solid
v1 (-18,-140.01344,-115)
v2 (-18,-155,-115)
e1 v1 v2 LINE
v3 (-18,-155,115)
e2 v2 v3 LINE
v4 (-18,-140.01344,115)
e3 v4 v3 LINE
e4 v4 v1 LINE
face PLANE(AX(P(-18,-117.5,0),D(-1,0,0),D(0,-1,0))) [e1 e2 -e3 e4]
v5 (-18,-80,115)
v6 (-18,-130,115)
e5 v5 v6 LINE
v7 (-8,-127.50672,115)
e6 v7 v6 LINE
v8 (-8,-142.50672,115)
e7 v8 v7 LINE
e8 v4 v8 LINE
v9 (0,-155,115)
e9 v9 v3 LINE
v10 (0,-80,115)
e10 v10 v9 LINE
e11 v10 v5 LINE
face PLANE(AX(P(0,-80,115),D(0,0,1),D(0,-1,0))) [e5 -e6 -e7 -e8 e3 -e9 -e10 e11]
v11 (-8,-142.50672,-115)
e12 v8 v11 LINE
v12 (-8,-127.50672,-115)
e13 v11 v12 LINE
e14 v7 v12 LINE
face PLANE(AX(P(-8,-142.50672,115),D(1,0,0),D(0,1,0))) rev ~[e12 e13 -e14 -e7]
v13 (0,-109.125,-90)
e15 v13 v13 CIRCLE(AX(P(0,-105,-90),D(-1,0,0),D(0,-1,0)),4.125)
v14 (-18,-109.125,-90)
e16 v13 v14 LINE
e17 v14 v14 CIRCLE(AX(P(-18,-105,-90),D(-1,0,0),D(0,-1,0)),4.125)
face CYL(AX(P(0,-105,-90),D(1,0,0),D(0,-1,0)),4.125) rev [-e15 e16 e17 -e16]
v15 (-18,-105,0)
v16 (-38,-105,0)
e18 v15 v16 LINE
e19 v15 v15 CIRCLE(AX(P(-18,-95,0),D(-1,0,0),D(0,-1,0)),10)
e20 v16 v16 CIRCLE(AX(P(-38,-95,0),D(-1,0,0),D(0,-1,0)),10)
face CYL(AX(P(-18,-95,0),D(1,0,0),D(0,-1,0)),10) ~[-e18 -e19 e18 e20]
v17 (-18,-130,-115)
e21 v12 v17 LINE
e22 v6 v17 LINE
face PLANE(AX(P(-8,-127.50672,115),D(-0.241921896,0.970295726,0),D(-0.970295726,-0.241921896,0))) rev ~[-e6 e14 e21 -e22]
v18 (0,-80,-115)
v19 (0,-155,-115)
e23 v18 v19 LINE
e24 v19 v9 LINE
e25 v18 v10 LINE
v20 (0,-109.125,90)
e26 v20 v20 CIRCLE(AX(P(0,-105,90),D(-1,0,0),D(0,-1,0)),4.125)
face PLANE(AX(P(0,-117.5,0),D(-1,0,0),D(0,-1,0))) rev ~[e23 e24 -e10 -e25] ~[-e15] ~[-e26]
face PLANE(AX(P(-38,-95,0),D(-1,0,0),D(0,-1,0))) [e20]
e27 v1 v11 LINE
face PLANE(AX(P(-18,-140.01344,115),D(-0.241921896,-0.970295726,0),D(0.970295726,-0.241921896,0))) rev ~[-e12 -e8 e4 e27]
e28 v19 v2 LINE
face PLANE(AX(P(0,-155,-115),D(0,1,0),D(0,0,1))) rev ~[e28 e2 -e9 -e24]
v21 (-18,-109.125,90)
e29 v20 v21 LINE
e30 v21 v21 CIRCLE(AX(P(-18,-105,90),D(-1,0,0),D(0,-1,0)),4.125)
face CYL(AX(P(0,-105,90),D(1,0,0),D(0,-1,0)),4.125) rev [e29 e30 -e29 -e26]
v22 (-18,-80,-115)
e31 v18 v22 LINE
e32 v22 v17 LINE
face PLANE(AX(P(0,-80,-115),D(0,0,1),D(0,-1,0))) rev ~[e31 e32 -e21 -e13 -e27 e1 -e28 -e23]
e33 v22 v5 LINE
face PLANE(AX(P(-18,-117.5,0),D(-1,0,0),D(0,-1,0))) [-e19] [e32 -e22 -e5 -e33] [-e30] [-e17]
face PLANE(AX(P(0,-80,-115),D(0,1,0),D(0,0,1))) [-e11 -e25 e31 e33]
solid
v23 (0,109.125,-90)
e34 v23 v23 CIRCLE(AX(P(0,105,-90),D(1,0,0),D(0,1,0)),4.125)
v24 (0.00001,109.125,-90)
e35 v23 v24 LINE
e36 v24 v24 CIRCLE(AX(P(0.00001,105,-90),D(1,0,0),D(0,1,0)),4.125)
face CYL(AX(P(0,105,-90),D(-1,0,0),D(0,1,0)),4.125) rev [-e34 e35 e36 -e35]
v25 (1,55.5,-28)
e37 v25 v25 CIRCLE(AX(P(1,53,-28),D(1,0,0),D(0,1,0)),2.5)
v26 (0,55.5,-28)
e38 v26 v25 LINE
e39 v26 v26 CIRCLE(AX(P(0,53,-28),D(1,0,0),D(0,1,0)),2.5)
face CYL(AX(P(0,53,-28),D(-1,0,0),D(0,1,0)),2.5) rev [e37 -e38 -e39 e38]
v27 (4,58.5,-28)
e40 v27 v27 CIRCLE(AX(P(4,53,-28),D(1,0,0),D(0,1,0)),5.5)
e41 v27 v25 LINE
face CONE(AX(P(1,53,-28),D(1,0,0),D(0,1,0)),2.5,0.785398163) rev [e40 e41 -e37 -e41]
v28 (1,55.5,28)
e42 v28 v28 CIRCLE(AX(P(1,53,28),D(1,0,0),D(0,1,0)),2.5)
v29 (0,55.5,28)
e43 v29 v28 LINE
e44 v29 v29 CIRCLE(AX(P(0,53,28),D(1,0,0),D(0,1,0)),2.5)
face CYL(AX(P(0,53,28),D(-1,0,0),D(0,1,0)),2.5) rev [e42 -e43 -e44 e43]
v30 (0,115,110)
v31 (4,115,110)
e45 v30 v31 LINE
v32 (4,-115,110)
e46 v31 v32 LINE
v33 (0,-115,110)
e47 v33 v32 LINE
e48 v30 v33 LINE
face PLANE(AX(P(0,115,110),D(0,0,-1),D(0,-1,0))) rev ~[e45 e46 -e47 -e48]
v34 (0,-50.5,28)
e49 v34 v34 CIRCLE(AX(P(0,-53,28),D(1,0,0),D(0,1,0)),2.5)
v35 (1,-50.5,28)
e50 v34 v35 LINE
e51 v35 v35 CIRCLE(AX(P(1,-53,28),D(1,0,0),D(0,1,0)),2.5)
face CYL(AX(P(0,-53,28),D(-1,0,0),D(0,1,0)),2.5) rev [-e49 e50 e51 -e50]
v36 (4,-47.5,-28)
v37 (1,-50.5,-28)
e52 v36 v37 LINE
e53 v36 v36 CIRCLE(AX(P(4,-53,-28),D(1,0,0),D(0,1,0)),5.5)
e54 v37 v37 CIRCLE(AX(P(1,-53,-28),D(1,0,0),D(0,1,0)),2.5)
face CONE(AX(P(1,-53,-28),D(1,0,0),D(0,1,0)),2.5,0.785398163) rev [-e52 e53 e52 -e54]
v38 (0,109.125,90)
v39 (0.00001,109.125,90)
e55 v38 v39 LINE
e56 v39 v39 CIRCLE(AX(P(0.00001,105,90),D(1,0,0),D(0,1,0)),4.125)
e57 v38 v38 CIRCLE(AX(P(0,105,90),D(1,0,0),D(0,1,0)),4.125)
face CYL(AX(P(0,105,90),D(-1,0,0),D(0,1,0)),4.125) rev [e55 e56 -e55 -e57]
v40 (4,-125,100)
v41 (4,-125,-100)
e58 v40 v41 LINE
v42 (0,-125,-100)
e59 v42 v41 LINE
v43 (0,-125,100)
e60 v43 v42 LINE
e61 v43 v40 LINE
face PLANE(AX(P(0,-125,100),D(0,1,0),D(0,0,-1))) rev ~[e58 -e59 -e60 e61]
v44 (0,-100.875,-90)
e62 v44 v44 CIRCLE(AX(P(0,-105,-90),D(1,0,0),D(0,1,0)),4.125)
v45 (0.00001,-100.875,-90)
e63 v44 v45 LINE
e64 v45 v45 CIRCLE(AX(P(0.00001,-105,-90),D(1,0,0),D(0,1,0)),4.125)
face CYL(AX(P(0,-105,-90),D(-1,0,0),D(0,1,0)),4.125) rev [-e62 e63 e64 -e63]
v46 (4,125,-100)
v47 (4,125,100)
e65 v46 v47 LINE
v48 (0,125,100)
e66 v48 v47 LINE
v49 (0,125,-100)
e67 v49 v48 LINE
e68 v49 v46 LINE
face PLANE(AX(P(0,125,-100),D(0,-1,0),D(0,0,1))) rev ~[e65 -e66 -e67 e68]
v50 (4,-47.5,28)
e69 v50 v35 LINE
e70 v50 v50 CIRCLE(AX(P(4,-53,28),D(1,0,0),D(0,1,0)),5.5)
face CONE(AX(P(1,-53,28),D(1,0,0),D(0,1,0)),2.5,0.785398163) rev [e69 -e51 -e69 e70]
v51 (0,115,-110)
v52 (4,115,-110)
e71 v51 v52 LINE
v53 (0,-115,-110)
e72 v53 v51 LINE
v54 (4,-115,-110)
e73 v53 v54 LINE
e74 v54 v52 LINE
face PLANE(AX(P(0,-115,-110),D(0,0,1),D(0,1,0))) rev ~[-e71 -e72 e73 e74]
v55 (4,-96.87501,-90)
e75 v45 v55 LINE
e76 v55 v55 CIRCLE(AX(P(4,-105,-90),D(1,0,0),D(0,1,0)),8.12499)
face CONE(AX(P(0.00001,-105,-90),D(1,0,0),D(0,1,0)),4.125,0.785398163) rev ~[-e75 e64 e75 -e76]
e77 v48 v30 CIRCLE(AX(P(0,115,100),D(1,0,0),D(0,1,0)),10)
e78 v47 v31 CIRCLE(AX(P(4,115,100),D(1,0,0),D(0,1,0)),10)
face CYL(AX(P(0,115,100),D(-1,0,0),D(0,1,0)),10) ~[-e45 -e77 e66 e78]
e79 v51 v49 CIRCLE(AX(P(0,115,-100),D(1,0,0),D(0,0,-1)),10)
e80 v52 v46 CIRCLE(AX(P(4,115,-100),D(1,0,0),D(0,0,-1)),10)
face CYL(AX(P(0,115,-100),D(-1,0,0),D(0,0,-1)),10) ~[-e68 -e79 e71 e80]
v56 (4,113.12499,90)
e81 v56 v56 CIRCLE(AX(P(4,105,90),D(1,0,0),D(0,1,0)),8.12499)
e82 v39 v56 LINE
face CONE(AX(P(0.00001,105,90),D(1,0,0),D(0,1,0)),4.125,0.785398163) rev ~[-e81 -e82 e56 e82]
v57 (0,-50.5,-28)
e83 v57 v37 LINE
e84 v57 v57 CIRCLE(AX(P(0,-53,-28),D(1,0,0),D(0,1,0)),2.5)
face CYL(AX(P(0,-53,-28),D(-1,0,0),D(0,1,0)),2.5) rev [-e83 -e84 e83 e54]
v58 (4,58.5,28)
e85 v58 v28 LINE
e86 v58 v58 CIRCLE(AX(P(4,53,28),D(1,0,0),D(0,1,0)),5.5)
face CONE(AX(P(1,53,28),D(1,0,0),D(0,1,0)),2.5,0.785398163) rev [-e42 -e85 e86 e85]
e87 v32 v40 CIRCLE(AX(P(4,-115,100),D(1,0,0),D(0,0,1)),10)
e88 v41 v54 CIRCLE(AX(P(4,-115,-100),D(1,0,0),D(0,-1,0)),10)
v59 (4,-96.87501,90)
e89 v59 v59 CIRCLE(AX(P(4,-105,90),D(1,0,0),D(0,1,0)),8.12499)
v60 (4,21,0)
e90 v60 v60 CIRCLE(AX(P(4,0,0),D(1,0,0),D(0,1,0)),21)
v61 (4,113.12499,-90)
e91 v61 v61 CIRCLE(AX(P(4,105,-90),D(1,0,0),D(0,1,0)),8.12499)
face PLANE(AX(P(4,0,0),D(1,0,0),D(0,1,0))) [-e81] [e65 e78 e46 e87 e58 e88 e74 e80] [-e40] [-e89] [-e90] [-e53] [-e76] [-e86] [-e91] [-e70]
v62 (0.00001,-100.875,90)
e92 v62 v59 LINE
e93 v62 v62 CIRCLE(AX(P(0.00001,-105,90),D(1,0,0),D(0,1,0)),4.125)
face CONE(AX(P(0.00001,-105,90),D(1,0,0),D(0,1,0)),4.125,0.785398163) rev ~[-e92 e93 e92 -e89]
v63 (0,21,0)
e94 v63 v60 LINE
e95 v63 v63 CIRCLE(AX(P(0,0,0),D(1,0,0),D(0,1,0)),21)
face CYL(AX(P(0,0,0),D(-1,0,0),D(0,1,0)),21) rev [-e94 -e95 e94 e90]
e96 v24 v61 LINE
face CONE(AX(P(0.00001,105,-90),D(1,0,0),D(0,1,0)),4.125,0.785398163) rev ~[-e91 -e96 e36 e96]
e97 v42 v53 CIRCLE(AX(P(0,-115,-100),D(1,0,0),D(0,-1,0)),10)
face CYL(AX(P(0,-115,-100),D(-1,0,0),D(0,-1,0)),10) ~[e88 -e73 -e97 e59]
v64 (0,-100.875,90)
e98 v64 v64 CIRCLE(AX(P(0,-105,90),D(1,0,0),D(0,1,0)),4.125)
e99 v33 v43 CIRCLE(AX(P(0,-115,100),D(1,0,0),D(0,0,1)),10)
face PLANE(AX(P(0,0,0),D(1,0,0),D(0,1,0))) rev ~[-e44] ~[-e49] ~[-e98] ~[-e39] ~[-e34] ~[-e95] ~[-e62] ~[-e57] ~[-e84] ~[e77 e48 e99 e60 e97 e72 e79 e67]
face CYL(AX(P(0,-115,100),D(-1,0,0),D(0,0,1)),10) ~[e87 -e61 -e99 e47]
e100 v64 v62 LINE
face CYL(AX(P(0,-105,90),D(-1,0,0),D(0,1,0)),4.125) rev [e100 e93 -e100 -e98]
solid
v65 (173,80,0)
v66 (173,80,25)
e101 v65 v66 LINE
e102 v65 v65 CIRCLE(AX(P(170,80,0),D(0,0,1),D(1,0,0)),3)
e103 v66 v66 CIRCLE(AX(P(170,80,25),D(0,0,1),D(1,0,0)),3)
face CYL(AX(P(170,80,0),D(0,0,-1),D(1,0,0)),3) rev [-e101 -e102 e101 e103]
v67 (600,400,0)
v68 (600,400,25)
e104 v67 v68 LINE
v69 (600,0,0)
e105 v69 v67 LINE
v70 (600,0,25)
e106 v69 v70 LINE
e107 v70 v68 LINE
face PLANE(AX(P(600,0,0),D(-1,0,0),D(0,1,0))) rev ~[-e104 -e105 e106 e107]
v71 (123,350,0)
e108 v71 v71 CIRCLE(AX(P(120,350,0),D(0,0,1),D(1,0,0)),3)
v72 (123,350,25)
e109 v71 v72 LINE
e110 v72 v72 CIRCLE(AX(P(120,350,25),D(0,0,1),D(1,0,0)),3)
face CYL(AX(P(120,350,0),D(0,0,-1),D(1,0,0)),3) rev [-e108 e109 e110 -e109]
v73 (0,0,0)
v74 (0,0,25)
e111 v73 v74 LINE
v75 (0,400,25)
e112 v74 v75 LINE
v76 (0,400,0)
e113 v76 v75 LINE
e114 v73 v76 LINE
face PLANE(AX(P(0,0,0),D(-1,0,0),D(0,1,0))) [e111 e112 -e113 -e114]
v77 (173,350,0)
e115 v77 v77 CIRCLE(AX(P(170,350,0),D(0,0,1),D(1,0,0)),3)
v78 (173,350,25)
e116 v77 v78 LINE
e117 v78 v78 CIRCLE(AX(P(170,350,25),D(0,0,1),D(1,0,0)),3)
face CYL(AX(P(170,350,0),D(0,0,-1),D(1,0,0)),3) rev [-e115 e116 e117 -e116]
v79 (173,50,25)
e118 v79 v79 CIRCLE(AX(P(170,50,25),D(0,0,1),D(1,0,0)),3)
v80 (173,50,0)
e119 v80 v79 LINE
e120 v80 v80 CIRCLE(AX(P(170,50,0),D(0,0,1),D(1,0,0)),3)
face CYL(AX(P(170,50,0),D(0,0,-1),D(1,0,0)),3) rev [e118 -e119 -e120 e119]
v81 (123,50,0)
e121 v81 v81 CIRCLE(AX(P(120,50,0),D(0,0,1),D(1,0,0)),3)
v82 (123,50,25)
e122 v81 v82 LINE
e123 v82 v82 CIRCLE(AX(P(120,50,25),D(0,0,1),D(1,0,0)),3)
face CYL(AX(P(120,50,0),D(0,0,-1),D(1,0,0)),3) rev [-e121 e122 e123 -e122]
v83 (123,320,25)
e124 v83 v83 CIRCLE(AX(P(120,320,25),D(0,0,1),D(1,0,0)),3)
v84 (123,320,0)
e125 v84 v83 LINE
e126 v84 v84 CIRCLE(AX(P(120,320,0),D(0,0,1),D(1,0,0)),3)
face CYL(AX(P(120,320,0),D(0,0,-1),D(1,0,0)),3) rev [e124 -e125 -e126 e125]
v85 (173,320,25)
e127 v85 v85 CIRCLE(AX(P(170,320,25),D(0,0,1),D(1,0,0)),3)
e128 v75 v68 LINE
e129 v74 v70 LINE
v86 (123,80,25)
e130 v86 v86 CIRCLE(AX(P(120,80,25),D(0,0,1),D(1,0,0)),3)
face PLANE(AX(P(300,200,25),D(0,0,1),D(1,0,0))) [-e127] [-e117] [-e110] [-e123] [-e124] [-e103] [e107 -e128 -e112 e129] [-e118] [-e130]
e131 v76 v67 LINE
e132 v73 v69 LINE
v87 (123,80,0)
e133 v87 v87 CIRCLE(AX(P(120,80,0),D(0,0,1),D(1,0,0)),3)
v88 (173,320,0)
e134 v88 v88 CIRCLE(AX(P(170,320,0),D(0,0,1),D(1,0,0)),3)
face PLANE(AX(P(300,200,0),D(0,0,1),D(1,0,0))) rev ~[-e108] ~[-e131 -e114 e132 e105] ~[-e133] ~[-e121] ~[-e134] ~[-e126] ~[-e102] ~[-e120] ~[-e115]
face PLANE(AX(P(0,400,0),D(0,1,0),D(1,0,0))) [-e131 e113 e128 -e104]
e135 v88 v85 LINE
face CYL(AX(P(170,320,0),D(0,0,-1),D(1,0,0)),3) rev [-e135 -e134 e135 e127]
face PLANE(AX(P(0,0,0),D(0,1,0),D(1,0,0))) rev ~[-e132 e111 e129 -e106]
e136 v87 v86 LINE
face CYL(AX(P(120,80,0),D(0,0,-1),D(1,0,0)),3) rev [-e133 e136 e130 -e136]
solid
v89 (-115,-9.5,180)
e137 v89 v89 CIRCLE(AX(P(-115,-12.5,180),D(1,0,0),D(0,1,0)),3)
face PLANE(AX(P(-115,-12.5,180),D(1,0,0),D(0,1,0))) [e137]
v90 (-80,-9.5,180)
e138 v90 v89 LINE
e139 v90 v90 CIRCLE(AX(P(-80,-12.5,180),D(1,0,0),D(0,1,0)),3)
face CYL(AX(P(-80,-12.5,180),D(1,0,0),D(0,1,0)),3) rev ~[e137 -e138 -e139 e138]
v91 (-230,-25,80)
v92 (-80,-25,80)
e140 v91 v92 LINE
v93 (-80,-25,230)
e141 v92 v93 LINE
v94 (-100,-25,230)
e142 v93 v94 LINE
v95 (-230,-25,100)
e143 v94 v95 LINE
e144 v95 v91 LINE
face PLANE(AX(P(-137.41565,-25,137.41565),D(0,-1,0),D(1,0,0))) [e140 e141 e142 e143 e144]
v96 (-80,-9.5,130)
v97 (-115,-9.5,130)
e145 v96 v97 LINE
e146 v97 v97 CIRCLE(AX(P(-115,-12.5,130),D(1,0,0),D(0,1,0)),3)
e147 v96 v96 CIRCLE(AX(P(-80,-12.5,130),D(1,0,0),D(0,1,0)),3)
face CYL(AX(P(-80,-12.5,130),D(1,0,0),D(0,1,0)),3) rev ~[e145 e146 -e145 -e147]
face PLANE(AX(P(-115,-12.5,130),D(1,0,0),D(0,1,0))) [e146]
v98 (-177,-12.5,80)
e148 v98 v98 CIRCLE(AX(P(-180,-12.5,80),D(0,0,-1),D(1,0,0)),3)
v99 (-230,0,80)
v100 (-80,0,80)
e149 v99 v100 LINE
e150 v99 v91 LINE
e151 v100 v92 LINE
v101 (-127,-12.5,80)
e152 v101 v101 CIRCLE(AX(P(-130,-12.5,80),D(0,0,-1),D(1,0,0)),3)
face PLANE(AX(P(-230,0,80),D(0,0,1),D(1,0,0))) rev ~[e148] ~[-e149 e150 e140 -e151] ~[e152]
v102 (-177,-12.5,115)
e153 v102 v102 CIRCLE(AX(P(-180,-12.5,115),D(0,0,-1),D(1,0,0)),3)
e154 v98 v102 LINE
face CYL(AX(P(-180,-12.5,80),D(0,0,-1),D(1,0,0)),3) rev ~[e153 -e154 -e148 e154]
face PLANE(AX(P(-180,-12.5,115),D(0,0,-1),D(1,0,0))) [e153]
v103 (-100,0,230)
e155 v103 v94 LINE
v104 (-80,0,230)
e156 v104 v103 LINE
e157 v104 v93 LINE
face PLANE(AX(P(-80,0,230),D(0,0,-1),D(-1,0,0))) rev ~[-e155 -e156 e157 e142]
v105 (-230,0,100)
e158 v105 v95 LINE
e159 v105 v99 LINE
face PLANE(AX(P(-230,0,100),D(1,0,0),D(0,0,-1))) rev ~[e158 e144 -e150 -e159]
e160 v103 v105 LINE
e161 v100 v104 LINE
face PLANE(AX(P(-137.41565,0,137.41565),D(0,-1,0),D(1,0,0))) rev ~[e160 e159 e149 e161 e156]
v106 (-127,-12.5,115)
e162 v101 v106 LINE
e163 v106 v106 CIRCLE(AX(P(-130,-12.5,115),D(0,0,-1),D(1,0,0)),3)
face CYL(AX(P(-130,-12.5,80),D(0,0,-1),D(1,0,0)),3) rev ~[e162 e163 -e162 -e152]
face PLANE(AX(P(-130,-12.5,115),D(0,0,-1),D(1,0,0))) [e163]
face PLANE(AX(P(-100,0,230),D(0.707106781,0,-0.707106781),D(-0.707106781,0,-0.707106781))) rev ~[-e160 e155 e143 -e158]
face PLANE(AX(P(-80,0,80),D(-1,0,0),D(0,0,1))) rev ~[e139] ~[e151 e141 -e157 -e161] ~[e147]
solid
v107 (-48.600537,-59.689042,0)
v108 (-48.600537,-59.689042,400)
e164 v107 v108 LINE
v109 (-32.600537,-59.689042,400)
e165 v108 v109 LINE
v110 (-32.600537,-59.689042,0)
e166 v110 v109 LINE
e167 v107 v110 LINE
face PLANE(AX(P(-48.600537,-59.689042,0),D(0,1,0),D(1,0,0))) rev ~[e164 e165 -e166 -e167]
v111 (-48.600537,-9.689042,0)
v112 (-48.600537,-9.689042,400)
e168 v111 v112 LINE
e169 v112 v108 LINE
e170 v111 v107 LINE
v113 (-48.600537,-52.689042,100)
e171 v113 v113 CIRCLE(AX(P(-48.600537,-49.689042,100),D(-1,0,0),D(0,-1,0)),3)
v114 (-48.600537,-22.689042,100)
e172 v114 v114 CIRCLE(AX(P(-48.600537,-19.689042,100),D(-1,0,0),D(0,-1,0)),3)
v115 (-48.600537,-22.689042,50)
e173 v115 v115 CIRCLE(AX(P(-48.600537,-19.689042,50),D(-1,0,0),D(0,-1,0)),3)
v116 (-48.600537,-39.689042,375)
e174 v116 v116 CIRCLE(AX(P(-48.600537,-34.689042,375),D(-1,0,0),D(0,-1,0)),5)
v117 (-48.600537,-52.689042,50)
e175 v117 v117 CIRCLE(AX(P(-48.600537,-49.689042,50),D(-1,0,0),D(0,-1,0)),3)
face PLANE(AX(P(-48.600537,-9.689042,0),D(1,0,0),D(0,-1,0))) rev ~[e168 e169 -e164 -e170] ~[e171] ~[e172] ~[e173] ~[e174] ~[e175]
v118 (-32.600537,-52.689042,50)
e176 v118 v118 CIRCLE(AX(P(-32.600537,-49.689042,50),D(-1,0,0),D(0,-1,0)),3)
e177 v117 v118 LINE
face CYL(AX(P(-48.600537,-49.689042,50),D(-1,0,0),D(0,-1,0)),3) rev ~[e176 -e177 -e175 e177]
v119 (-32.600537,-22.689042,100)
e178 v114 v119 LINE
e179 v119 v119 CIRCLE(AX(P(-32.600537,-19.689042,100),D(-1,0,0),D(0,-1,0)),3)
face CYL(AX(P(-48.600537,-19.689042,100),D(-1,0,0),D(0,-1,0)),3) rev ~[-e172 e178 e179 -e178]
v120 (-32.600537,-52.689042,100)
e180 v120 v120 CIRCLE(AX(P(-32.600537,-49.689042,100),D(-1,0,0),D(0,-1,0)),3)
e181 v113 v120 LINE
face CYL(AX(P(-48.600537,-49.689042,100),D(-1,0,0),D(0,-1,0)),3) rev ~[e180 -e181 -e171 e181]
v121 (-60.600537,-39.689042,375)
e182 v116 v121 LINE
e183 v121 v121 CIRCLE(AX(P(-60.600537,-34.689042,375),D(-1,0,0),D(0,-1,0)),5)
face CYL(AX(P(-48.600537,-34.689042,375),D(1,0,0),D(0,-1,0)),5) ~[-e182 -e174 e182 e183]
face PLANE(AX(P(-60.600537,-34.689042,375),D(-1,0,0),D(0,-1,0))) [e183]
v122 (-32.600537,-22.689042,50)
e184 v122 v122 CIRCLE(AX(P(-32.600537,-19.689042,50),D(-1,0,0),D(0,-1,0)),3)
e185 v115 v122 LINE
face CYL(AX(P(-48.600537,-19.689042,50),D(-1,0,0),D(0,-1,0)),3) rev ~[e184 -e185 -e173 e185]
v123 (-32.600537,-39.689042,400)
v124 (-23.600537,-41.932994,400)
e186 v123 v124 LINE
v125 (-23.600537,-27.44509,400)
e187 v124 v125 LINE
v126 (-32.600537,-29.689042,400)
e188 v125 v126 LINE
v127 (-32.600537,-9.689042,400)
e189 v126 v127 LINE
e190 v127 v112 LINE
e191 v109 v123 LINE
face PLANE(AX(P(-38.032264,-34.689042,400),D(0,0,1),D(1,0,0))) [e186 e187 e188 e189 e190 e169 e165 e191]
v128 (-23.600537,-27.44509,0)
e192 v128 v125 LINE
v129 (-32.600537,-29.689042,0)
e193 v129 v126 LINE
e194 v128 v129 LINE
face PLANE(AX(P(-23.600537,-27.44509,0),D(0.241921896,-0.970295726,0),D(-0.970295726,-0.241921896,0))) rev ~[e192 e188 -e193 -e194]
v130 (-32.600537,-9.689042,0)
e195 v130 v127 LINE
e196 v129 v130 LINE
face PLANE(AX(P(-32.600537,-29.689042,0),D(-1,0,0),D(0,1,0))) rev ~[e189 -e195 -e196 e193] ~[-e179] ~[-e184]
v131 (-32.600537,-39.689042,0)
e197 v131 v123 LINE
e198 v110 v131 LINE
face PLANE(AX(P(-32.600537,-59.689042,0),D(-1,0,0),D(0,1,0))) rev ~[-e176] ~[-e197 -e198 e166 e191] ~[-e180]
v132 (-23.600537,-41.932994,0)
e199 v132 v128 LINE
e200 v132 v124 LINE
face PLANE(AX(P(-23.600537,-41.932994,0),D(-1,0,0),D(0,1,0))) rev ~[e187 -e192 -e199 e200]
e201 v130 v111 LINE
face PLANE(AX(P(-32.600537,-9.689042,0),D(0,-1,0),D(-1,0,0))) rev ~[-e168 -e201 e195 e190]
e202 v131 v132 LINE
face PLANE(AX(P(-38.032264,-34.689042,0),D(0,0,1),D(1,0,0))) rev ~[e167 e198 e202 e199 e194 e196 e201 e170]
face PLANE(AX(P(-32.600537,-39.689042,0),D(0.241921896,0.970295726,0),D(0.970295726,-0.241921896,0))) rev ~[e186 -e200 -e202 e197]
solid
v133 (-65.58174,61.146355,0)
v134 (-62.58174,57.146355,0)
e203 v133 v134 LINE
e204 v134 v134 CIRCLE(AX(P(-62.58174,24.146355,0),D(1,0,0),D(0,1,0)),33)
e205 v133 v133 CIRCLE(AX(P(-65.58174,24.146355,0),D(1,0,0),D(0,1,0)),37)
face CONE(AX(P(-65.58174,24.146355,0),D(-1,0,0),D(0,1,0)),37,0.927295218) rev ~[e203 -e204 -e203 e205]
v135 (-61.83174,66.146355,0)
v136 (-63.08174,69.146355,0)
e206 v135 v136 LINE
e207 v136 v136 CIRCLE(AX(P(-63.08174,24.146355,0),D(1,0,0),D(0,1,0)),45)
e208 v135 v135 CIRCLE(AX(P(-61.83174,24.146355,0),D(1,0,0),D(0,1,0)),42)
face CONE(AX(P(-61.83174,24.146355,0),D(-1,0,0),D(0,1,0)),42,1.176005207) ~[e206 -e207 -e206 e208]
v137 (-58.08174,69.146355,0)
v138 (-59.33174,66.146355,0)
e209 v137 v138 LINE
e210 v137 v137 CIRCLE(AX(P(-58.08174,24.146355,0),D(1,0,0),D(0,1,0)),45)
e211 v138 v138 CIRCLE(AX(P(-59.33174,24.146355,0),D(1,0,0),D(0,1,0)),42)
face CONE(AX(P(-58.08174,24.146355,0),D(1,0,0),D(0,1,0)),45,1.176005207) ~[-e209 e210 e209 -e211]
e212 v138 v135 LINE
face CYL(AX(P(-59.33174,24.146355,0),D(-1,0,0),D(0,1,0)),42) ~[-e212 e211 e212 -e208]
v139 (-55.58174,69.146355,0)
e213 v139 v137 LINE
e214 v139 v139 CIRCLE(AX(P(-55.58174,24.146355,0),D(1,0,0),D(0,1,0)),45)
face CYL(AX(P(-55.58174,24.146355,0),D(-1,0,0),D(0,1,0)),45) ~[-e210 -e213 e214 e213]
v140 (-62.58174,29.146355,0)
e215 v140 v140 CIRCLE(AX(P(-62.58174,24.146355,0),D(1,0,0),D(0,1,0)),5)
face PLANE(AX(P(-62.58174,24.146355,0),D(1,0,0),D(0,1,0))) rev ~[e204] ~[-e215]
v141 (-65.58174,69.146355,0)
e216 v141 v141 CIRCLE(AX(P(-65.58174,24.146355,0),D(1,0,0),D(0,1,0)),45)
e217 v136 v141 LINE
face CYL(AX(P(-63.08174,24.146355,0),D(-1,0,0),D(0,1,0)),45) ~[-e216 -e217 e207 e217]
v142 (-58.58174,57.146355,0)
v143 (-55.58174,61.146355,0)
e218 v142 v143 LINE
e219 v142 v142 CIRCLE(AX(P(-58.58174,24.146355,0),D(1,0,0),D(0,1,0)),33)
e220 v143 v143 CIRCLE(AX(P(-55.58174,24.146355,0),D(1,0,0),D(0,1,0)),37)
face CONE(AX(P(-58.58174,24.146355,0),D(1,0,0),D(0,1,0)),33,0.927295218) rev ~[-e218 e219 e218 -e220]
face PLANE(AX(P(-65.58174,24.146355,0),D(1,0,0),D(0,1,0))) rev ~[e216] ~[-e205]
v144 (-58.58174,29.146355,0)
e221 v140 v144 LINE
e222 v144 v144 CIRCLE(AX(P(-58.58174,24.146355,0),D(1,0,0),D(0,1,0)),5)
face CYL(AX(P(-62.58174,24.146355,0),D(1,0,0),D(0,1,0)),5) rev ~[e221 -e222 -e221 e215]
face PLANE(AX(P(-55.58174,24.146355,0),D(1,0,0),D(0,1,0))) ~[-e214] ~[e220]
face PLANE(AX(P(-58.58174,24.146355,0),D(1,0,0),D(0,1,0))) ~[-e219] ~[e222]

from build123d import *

# Parameters (mm, degrees)
F0_R      = 4.125
F0_R_2    = 2.5
F0_R_3    = 21
F1_DEPTH  = 4
F2_SIZE   = 3.99999
F3_SIZE   = 3
F4_W      = 75
F4_H      = 230
F4_R      = 4.125
F5_DEPTH  = 18
F7_DEPTH  = 230
F8_R      = 10
F9_DEPTH  = 20
F11_DEPTH = 400
F12_R     = 3
F13_DEPTH = 25
F14_R     = 5
F15_DEPTH = 12
F18_W     = 600
F18_H     = 400
F18_R     = 3
F19_DEPTH = 25
F21_DEPTH = 25
F22_R     = 3
F23_DEPTH = 35
F24_R     = 3
F25_DEPTH = 35


# Not quite as in the source:
# - a fillet or chamfer is up to 0.001 mm smaller than in the source, because OpenCascade refuses the exact size


with BuildPart() as f1:
    # F0 (on Right) → F1 (new body)
    with BuildSketch(Plane.YZ):
        with BuildLine():
            Line((115, 110), (-115, 110))
            ThreePointArc((-115, 110), (-122.0710678119, 107.0710678119), (-125, 100))
            Line((-125, 100), (-125, -100))
            ThreePointArc((-125, -100), (-122.0710678119, -107.0710678119), (-115, -110))
            Line((-115, -110), (115, -110))
            ThreePointArc((115, -110), (122.0710678119, -107.0710678119), (125, -100))
            Line((125, -100), (125, 100))
            ThreePointArc((125, 100), (122.0710678119, 107.0710678119), (115, 110))
        make_face()
        with Locations((-105, -90)):
            Circle(F0_R, mode=Mode.SUBTRACT)
        with Locations((-53, -28)):
            Circle(F0_R_2, mode=Mode.SUBTRACT)
        with Locations((105, -90)):
            Circle(F0_R, mode=Mode.SUBTRACT)
        with Locations((53, -28)):
            Circle(F0_R_2, mode=Mode.SUBTRACT)
        with Locations((-53, 28)):
            Circle(F0_R_2, mode=Mode.SUBTRACT)
        with Locations((-105, 90)):
            Circle(F0_R, mode=Mode.SUBTRACT)
        Circle(F0_R_3, mode=Mode.SUBTRACT)
        with Locations((53, 28)):
            Circle(F0_R_2, mode=Mode.SUBTRACT)
        with Locations((105, 90)):
            Circle(F0_R, mode=Mode.SUBTRACT)
    extrude(amount=F1_DEPTH)

    # F2 (size 4 in the source; OpenCascade refuses exactly that, so slightly less here)
    f2_edges = [f1.edges().sort_by_distance(p)[0] for p in [
        (4, -109.125, 90),
        (4, 100.875, 90),
        (4, 100.875, -90),
        (4, -109.125, -90),
    ]]
    chamfer(f2_edges, length=F2_SIZE)

    # F3
    f3_edges = [f1.edges().sort_by_distance(p)[0] for p in [
        (4, -55.5, 28),
        (4, -55.5, -28),
        (4, 50.5, -28),
        (4, 50.5, 28),
    ]]
    chamfer(f3_edges, length=F3_SIZE)


with BuildPart() as f5:
    # F4 (on face) → F5 (new body)
    with BuildSketch(Plane(origin=(0, 0, 0), x_dir=(0, -1, 0), z_dir=(-1, 0, 0))):
        with Locations((117.5, 0)):
            Rectangle(F4_W, F4_H)
        with Locations((105, -90)):
            Circle(F4_R, mode=Mode.SUBTRACT)
        with Locations((105, 90)):
            Circle(F4_R, mode=Mode.SUBTRACT)
    extrude(amount=F5_DEPTH)

    # F6 (on face) → F7 (cut, through all)
    with BuildSketch(Plane.XY.offset(115)):
        Polygon((-18, -130), (-18, -140.0134399431), (-8, -142.5067199716), (-8, -127.5067199716), align=None)
    extrude(amount=-F7_DEPTH, mode=Mode.SUBTRACT)

    # F8 (on face) → F9 (join)
    with BuildSketch(Plane(origin=(-18, 0, 0), x_dir=(0, -1, 0), z_dir=(-1, 0, 0))):
        with Locations((95, 0)):
            Circle(F8_R)
    extrude(amount=F9_DEPTH)


with BuildPart() as f11:
    # F10 (on Top) → F11 (new body)
    with BuildSketch(Plane.XY):
        Polygon((-48.6005372249, -59.6890420537), (-32.6005372249, -59.6890420537), (-32.6005372249, -39.6890420537), (-23.6005372249, -41.9329940793), (-23.6005372249, -27.4450900281), (-32.6005372249, -29.6890420537), (-32.6005372249, -9.6890420537), (-48.6005372249, -9.6890420537), align=None)
    extrude(amount=F11_DEPTH)

    # F12 (on face) → F13 (cut)
    with BuildSketch(Plane(origin=(-48.6005372249, 0, 0), x_dir=(0, -1, 0), z_dir=(-1, 0, 0))):
        with Locations((49.6890420537, 50)):
            Circle(F12_R)
        with Locations((49.6890420537, 100)):
            Circle(F12_R)
        with Locations((19.6890420537, 100)):
            Circle(F12_R)
        with Locations((19.6890420537, 50)):
            Circle(F12_R)
    extrude(amount=-F13_DEPTH, mode=Mode.SUBTRACT)

    # F14 (on face) → F15 (join)
    with BuildSketch(Plane(origin=(-48.6005372249, 0, 0), x_dir=(0, -1, 0), z_dir=(-1, 0, 0))):
        with Locations((34.6890420537, 375)):
            Circle(F14_R)
    extrude(amount=F15_DEPTH)


with BuildPart() as f17:
    # F16 (on Top) → F17 (revolve)
    with BuildSketch(Plane.XY):
        Polygon((-62.5817395097, 57.1463547086), (-62.5817395097, 29.1463547086), (-58.5817395097, 29.1463547086), (-58.5817395097, 57.1463547086), (-55.5817395097, 61.1463547086), (-55.5817395097, 69.1463547086), (-58.0817395097, 69.1463547086), (-59.3317395097, 66.1463547086), (-61.8317395097, 66.1463547086), (-63.0817395097, 69.1463547086), (-65.5817395097, 69.1463547086), (-65.5817395097, 61.1463547086), align=None)
    revolve(axis=Axis((-60.5817395097, 24.1463547086, 0), (1, 0, 0)))


with BuildPart() as f19:
    # F18 (on Top) → F19 (new body)
    with BuildSketch(Plane.XY):
        with Locations((300, 200)):
            Rectangle(F18_W, F18_H)
        with Locations((120, 50)):
            Circle(F18_R, mode=Mode.SUBTRACT)
        with Locations((120, 80)):
            Circle(F18_R, mode=Mode.SUBTRACT)
        with Locations((170, 50)):
            Circle(F18_R, mode=Mode.SUBTRACT)
        with Locations((170, 80)):
            Circle(F18_R, mode=Mode.SUBTRACT)
        with Locations((120, 320)):
            Circle(F18_R, mode=Mode.SUBTRACT)
        with Locations((120, 350)):
            Circle(F18_R, mode=Mode.SUBTRACT)
        with Locations((170, 320)):
            Circle(F18_R, mode=Mode.SUBTRACT)
        with Locations((170, 350)):
            Circle(F18_R, mode=Mode.SUBTRACT)
    extrude(amount=F19_DEPTH)


with BuildPart() as f21:
    # F20 (on Front) → F21 (new body)
    with BuildSketch(Plane.XZ):
        Polygon((-230, 80), (-80, 80), (-80, 230), (-100, 230), (-230, 100), align=None)
    extrude(amount=F21_DEPTH)

    # F22 (on face) → F23 (cut)
    with BuildSketch(Plane(origin=(0, 0, 80), x_dir=(1, 0, 0), z_dir=(0, 0, -1))):
        with Locations((-180, 12.5)):
            Circle(F22_R)
        with Locations((-130, 12.5)):
            Circle(F22_R)
    extrude(amount=-F23_DEPTH, mode=Mode.SUBTRACT)

    # F24 (on face) → F25 (cut)
    with BuildSketch(Plane.YZ.offset(-80)):
        with Locations((-12.5, 180)):
            Circle(F24_R)
        with Locations((-12.5, 130)):
            Circle(F24_R)
    extrude(amount=-F25_DEPTH, mode=Mode.SUBTRACT)


solid = Compound([f1.part, f5.part, f11.part, f17.part, f19.part, f21.part])
